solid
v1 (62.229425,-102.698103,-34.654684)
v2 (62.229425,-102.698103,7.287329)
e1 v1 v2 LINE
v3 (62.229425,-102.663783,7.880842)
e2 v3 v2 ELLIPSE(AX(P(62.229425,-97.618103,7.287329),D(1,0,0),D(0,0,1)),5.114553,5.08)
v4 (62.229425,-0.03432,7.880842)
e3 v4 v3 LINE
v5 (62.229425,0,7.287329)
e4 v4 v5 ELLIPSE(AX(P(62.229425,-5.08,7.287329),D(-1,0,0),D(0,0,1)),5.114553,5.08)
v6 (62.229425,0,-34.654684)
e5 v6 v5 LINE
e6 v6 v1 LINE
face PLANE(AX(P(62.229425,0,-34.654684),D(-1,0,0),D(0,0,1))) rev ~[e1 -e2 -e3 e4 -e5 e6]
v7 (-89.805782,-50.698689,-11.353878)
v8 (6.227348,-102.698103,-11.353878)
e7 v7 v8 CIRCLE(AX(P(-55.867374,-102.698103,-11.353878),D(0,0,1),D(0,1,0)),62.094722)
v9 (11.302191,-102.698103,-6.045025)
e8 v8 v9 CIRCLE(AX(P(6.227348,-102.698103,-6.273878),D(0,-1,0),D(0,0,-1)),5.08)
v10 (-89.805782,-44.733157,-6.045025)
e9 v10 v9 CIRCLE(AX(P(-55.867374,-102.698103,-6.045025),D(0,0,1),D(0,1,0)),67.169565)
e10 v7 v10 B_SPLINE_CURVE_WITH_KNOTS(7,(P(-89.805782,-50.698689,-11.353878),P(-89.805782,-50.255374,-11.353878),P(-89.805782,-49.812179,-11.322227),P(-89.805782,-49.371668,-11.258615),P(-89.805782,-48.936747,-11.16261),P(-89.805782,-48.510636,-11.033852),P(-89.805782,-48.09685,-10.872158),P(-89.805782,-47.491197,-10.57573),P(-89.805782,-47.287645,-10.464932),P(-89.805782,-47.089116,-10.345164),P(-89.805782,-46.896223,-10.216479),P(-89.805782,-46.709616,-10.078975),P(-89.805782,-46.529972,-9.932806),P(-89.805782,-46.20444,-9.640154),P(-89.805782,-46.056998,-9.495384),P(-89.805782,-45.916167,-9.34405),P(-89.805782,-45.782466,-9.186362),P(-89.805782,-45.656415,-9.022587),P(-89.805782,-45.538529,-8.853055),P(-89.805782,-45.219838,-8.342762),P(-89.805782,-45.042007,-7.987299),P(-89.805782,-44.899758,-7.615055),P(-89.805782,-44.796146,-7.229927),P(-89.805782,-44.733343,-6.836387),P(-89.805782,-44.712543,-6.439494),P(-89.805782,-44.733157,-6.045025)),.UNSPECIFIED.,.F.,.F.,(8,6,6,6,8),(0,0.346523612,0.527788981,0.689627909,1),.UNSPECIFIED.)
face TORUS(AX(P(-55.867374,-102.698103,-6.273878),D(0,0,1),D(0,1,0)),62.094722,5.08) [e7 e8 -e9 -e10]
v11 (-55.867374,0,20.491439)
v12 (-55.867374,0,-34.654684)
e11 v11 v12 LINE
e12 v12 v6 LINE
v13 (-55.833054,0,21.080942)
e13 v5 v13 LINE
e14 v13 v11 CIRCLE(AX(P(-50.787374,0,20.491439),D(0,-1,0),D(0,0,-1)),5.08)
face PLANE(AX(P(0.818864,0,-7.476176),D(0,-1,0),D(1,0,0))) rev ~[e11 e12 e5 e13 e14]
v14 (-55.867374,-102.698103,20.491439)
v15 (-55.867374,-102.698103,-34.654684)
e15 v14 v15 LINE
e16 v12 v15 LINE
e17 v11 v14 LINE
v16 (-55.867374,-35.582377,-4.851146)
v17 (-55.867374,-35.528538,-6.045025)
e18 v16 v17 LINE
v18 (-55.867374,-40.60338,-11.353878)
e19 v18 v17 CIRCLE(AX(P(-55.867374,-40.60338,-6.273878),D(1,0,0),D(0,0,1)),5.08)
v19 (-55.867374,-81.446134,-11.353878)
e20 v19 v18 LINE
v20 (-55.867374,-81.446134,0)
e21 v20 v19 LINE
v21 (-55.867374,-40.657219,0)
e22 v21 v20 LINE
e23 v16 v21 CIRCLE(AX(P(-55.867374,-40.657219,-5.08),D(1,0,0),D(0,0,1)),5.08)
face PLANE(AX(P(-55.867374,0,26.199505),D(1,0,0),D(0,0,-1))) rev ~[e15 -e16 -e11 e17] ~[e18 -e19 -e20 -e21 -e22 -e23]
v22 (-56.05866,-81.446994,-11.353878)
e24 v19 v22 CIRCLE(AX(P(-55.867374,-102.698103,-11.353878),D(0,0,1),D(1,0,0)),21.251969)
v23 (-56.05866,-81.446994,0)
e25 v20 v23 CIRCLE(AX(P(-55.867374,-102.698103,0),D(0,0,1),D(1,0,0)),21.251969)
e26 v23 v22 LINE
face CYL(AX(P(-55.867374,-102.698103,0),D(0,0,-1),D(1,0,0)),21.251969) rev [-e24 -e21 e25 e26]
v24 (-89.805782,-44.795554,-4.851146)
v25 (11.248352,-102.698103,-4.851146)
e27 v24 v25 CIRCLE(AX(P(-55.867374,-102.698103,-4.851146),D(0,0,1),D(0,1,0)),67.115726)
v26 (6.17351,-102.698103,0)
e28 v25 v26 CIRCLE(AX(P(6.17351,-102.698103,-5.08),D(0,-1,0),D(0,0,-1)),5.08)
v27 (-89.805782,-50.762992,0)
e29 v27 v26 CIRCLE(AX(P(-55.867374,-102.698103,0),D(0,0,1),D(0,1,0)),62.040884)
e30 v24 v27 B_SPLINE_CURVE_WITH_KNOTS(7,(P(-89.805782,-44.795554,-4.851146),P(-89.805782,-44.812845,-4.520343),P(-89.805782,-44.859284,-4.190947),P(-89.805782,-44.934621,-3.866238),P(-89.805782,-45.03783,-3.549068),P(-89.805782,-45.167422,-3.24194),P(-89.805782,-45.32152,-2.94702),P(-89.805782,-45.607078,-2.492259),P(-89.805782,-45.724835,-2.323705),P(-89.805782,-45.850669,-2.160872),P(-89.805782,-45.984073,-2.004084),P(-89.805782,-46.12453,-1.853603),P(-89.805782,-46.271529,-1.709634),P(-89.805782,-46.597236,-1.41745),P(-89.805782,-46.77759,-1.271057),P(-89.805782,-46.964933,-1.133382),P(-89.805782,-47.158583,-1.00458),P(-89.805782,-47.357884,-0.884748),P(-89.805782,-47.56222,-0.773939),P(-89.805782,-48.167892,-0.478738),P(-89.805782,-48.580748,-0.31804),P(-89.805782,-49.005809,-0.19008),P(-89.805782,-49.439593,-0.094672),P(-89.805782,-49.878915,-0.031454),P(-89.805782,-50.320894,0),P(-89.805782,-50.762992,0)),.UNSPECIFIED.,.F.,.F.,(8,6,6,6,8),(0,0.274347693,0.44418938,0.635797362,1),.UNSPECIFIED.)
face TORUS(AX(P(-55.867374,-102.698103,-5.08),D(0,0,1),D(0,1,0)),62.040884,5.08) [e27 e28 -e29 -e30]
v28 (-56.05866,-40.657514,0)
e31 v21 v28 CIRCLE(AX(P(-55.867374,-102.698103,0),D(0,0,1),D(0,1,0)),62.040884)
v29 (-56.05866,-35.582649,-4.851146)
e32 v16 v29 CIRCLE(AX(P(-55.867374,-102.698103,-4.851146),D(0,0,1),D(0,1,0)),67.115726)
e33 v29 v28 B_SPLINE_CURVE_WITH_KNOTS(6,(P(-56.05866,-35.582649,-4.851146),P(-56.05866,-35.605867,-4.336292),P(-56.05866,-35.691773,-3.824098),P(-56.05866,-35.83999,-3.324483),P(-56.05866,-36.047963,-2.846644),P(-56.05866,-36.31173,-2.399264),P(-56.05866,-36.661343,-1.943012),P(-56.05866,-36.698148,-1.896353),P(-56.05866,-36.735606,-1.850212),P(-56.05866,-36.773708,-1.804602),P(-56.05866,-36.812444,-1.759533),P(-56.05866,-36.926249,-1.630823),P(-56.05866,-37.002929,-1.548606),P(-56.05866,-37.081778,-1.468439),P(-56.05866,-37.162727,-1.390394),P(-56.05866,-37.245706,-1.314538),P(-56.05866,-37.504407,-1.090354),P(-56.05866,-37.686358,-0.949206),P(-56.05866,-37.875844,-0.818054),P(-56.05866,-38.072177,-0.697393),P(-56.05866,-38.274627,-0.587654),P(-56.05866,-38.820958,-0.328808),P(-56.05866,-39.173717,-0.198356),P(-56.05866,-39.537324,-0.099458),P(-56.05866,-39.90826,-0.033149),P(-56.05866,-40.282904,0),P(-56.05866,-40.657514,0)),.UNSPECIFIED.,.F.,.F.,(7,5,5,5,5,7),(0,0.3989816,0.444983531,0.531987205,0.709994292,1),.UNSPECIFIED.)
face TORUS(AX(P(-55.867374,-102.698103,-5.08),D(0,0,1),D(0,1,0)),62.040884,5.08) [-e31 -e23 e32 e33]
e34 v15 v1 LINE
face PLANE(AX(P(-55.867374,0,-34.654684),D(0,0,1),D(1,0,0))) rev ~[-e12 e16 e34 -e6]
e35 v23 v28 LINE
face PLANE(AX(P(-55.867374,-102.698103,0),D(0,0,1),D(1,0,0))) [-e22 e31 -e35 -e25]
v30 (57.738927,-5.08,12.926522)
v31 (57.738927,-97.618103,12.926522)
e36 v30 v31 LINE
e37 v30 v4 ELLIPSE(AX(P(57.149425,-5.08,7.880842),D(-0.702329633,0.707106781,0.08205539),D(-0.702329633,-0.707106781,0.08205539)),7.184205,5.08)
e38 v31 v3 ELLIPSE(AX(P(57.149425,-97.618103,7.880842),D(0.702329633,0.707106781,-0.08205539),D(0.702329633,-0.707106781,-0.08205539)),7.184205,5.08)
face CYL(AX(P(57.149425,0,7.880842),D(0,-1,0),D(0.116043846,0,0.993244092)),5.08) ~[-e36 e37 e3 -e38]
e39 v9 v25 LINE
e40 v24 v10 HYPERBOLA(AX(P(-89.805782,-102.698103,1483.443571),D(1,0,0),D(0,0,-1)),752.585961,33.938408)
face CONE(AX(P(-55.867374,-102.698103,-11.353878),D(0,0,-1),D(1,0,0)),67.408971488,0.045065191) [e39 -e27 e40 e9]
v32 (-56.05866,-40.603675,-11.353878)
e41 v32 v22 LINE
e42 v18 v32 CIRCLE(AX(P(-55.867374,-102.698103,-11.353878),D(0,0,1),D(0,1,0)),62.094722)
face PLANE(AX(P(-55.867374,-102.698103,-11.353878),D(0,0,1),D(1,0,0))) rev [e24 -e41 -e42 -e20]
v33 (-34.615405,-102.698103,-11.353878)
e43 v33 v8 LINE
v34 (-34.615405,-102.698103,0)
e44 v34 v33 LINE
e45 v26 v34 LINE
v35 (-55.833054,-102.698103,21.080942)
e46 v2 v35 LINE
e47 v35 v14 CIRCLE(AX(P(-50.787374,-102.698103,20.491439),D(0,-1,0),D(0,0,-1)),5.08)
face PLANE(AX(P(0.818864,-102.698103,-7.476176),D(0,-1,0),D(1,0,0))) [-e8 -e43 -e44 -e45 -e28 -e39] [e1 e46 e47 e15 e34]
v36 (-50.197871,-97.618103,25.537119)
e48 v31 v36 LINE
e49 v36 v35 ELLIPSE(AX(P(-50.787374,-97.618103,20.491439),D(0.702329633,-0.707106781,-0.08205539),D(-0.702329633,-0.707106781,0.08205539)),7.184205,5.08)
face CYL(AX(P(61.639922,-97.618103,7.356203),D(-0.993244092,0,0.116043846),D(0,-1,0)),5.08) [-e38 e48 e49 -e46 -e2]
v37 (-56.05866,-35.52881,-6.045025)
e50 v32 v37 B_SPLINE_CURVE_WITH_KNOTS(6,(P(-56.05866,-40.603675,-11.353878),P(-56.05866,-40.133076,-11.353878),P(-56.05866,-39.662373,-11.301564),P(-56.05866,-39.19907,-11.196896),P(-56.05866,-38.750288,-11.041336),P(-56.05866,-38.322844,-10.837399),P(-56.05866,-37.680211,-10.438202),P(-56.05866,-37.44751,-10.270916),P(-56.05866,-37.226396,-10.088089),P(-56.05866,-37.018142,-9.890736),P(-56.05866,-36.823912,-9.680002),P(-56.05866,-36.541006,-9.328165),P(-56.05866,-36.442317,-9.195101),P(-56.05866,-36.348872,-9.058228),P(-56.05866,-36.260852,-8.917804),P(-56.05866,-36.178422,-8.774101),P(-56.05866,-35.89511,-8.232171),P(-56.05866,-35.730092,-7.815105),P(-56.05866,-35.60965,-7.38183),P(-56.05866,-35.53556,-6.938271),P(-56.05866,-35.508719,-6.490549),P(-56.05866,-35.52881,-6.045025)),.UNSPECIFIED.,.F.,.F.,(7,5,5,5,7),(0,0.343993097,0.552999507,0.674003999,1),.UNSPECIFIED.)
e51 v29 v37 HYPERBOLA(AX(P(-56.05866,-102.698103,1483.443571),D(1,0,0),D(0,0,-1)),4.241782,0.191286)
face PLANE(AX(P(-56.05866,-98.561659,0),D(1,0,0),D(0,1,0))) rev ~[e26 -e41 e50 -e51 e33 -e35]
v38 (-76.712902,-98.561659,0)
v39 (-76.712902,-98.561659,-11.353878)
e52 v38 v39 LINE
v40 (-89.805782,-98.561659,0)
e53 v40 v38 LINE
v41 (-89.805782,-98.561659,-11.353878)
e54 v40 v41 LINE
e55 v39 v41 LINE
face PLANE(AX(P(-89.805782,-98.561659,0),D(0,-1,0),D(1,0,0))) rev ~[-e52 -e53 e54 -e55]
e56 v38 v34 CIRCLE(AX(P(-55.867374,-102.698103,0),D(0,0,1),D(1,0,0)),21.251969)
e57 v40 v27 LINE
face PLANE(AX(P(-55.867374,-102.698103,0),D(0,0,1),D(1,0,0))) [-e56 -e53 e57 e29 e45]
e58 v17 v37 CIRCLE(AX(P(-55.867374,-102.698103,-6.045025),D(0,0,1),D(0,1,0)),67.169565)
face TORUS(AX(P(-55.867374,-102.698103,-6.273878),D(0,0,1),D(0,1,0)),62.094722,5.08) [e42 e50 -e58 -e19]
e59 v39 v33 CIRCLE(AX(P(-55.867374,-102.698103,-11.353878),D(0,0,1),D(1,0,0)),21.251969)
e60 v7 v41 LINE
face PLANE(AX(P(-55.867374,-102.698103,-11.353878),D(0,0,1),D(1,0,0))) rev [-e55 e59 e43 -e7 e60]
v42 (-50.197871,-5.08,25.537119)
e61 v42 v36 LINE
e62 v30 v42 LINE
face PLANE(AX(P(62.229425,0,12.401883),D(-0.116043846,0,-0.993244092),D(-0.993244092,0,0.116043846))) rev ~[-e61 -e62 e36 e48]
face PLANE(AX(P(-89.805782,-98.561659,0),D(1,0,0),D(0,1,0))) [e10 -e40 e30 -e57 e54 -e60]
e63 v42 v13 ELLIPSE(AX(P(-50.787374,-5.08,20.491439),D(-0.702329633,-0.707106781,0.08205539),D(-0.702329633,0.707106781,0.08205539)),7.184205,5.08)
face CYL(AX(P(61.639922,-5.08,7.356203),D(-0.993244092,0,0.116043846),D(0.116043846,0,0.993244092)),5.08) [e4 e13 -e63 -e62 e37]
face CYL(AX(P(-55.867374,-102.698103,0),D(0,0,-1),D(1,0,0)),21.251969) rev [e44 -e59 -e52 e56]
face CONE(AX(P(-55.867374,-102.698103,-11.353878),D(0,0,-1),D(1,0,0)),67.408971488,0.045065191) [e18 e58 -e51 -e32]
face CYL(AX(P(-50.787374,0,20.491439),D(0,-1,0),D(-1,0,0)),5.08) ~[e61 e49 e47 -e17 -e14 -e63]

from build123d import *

# Parameters (mm, degrees)
F1_DEPTH = 102.6981025934
F4_R     = 5.08
F5_W     = 33.7471216917
F5_H     = 65.5695050955
F6_DEPTH = 25.4


with BuildPart() as f1:
    # F0 (on Front) → F1 (new body)
    with BuildSketch(Plane.XZ):
        Polygon((62.229424715, -34.6546843648), (62.229424715, 12.4018825591), (-55.8673739433, 26.1995047331), (-55.8673739433, -34.6546843648), align=None)
    extrude(amount=F1_DEPTH)

    # F2 (on face) → F3 (revolve)
    with BuildSketch(Plane.XZ.offset(102.6981025934)):
        Polygon((-34.6154049039, -11.3538783044), (11.5415975451, -11.3538783044), (11.0295861959, 0), (-34.6154049039, 0), align=None)
    revolve(axis=Axis((-55.8673739433, -102.6981025934, -4.2275898159), (0, 0, 1)))

    # F4
    f4_edges = [f1.edges().sort_by_distance(p)[0] for p in [
        (62.229425, -51.349051, 12.401883),
        (-55.867374, -51.349051, 26.199505),
        (3.181025, 0, 19.300694),
        (3.181025, -102.698103, 19.300694),
        (-103.532715, -150.363443, -11.353878),
        (-103.170668, -150.001397, 0),
    ]]
    fillet(f4_edges, radius=F4_R)

    # F5 (on Top) → F6 (cut)
    with BuildSketch(Plane.XY):
        with Locations((-72.9322209954, -65.7769069076)):
            Rectangle(F5_W, F5_H)
    extrude(amount=-F6_DEPTH, mode=Mode.SUBTRACT)


solid = f1.part
